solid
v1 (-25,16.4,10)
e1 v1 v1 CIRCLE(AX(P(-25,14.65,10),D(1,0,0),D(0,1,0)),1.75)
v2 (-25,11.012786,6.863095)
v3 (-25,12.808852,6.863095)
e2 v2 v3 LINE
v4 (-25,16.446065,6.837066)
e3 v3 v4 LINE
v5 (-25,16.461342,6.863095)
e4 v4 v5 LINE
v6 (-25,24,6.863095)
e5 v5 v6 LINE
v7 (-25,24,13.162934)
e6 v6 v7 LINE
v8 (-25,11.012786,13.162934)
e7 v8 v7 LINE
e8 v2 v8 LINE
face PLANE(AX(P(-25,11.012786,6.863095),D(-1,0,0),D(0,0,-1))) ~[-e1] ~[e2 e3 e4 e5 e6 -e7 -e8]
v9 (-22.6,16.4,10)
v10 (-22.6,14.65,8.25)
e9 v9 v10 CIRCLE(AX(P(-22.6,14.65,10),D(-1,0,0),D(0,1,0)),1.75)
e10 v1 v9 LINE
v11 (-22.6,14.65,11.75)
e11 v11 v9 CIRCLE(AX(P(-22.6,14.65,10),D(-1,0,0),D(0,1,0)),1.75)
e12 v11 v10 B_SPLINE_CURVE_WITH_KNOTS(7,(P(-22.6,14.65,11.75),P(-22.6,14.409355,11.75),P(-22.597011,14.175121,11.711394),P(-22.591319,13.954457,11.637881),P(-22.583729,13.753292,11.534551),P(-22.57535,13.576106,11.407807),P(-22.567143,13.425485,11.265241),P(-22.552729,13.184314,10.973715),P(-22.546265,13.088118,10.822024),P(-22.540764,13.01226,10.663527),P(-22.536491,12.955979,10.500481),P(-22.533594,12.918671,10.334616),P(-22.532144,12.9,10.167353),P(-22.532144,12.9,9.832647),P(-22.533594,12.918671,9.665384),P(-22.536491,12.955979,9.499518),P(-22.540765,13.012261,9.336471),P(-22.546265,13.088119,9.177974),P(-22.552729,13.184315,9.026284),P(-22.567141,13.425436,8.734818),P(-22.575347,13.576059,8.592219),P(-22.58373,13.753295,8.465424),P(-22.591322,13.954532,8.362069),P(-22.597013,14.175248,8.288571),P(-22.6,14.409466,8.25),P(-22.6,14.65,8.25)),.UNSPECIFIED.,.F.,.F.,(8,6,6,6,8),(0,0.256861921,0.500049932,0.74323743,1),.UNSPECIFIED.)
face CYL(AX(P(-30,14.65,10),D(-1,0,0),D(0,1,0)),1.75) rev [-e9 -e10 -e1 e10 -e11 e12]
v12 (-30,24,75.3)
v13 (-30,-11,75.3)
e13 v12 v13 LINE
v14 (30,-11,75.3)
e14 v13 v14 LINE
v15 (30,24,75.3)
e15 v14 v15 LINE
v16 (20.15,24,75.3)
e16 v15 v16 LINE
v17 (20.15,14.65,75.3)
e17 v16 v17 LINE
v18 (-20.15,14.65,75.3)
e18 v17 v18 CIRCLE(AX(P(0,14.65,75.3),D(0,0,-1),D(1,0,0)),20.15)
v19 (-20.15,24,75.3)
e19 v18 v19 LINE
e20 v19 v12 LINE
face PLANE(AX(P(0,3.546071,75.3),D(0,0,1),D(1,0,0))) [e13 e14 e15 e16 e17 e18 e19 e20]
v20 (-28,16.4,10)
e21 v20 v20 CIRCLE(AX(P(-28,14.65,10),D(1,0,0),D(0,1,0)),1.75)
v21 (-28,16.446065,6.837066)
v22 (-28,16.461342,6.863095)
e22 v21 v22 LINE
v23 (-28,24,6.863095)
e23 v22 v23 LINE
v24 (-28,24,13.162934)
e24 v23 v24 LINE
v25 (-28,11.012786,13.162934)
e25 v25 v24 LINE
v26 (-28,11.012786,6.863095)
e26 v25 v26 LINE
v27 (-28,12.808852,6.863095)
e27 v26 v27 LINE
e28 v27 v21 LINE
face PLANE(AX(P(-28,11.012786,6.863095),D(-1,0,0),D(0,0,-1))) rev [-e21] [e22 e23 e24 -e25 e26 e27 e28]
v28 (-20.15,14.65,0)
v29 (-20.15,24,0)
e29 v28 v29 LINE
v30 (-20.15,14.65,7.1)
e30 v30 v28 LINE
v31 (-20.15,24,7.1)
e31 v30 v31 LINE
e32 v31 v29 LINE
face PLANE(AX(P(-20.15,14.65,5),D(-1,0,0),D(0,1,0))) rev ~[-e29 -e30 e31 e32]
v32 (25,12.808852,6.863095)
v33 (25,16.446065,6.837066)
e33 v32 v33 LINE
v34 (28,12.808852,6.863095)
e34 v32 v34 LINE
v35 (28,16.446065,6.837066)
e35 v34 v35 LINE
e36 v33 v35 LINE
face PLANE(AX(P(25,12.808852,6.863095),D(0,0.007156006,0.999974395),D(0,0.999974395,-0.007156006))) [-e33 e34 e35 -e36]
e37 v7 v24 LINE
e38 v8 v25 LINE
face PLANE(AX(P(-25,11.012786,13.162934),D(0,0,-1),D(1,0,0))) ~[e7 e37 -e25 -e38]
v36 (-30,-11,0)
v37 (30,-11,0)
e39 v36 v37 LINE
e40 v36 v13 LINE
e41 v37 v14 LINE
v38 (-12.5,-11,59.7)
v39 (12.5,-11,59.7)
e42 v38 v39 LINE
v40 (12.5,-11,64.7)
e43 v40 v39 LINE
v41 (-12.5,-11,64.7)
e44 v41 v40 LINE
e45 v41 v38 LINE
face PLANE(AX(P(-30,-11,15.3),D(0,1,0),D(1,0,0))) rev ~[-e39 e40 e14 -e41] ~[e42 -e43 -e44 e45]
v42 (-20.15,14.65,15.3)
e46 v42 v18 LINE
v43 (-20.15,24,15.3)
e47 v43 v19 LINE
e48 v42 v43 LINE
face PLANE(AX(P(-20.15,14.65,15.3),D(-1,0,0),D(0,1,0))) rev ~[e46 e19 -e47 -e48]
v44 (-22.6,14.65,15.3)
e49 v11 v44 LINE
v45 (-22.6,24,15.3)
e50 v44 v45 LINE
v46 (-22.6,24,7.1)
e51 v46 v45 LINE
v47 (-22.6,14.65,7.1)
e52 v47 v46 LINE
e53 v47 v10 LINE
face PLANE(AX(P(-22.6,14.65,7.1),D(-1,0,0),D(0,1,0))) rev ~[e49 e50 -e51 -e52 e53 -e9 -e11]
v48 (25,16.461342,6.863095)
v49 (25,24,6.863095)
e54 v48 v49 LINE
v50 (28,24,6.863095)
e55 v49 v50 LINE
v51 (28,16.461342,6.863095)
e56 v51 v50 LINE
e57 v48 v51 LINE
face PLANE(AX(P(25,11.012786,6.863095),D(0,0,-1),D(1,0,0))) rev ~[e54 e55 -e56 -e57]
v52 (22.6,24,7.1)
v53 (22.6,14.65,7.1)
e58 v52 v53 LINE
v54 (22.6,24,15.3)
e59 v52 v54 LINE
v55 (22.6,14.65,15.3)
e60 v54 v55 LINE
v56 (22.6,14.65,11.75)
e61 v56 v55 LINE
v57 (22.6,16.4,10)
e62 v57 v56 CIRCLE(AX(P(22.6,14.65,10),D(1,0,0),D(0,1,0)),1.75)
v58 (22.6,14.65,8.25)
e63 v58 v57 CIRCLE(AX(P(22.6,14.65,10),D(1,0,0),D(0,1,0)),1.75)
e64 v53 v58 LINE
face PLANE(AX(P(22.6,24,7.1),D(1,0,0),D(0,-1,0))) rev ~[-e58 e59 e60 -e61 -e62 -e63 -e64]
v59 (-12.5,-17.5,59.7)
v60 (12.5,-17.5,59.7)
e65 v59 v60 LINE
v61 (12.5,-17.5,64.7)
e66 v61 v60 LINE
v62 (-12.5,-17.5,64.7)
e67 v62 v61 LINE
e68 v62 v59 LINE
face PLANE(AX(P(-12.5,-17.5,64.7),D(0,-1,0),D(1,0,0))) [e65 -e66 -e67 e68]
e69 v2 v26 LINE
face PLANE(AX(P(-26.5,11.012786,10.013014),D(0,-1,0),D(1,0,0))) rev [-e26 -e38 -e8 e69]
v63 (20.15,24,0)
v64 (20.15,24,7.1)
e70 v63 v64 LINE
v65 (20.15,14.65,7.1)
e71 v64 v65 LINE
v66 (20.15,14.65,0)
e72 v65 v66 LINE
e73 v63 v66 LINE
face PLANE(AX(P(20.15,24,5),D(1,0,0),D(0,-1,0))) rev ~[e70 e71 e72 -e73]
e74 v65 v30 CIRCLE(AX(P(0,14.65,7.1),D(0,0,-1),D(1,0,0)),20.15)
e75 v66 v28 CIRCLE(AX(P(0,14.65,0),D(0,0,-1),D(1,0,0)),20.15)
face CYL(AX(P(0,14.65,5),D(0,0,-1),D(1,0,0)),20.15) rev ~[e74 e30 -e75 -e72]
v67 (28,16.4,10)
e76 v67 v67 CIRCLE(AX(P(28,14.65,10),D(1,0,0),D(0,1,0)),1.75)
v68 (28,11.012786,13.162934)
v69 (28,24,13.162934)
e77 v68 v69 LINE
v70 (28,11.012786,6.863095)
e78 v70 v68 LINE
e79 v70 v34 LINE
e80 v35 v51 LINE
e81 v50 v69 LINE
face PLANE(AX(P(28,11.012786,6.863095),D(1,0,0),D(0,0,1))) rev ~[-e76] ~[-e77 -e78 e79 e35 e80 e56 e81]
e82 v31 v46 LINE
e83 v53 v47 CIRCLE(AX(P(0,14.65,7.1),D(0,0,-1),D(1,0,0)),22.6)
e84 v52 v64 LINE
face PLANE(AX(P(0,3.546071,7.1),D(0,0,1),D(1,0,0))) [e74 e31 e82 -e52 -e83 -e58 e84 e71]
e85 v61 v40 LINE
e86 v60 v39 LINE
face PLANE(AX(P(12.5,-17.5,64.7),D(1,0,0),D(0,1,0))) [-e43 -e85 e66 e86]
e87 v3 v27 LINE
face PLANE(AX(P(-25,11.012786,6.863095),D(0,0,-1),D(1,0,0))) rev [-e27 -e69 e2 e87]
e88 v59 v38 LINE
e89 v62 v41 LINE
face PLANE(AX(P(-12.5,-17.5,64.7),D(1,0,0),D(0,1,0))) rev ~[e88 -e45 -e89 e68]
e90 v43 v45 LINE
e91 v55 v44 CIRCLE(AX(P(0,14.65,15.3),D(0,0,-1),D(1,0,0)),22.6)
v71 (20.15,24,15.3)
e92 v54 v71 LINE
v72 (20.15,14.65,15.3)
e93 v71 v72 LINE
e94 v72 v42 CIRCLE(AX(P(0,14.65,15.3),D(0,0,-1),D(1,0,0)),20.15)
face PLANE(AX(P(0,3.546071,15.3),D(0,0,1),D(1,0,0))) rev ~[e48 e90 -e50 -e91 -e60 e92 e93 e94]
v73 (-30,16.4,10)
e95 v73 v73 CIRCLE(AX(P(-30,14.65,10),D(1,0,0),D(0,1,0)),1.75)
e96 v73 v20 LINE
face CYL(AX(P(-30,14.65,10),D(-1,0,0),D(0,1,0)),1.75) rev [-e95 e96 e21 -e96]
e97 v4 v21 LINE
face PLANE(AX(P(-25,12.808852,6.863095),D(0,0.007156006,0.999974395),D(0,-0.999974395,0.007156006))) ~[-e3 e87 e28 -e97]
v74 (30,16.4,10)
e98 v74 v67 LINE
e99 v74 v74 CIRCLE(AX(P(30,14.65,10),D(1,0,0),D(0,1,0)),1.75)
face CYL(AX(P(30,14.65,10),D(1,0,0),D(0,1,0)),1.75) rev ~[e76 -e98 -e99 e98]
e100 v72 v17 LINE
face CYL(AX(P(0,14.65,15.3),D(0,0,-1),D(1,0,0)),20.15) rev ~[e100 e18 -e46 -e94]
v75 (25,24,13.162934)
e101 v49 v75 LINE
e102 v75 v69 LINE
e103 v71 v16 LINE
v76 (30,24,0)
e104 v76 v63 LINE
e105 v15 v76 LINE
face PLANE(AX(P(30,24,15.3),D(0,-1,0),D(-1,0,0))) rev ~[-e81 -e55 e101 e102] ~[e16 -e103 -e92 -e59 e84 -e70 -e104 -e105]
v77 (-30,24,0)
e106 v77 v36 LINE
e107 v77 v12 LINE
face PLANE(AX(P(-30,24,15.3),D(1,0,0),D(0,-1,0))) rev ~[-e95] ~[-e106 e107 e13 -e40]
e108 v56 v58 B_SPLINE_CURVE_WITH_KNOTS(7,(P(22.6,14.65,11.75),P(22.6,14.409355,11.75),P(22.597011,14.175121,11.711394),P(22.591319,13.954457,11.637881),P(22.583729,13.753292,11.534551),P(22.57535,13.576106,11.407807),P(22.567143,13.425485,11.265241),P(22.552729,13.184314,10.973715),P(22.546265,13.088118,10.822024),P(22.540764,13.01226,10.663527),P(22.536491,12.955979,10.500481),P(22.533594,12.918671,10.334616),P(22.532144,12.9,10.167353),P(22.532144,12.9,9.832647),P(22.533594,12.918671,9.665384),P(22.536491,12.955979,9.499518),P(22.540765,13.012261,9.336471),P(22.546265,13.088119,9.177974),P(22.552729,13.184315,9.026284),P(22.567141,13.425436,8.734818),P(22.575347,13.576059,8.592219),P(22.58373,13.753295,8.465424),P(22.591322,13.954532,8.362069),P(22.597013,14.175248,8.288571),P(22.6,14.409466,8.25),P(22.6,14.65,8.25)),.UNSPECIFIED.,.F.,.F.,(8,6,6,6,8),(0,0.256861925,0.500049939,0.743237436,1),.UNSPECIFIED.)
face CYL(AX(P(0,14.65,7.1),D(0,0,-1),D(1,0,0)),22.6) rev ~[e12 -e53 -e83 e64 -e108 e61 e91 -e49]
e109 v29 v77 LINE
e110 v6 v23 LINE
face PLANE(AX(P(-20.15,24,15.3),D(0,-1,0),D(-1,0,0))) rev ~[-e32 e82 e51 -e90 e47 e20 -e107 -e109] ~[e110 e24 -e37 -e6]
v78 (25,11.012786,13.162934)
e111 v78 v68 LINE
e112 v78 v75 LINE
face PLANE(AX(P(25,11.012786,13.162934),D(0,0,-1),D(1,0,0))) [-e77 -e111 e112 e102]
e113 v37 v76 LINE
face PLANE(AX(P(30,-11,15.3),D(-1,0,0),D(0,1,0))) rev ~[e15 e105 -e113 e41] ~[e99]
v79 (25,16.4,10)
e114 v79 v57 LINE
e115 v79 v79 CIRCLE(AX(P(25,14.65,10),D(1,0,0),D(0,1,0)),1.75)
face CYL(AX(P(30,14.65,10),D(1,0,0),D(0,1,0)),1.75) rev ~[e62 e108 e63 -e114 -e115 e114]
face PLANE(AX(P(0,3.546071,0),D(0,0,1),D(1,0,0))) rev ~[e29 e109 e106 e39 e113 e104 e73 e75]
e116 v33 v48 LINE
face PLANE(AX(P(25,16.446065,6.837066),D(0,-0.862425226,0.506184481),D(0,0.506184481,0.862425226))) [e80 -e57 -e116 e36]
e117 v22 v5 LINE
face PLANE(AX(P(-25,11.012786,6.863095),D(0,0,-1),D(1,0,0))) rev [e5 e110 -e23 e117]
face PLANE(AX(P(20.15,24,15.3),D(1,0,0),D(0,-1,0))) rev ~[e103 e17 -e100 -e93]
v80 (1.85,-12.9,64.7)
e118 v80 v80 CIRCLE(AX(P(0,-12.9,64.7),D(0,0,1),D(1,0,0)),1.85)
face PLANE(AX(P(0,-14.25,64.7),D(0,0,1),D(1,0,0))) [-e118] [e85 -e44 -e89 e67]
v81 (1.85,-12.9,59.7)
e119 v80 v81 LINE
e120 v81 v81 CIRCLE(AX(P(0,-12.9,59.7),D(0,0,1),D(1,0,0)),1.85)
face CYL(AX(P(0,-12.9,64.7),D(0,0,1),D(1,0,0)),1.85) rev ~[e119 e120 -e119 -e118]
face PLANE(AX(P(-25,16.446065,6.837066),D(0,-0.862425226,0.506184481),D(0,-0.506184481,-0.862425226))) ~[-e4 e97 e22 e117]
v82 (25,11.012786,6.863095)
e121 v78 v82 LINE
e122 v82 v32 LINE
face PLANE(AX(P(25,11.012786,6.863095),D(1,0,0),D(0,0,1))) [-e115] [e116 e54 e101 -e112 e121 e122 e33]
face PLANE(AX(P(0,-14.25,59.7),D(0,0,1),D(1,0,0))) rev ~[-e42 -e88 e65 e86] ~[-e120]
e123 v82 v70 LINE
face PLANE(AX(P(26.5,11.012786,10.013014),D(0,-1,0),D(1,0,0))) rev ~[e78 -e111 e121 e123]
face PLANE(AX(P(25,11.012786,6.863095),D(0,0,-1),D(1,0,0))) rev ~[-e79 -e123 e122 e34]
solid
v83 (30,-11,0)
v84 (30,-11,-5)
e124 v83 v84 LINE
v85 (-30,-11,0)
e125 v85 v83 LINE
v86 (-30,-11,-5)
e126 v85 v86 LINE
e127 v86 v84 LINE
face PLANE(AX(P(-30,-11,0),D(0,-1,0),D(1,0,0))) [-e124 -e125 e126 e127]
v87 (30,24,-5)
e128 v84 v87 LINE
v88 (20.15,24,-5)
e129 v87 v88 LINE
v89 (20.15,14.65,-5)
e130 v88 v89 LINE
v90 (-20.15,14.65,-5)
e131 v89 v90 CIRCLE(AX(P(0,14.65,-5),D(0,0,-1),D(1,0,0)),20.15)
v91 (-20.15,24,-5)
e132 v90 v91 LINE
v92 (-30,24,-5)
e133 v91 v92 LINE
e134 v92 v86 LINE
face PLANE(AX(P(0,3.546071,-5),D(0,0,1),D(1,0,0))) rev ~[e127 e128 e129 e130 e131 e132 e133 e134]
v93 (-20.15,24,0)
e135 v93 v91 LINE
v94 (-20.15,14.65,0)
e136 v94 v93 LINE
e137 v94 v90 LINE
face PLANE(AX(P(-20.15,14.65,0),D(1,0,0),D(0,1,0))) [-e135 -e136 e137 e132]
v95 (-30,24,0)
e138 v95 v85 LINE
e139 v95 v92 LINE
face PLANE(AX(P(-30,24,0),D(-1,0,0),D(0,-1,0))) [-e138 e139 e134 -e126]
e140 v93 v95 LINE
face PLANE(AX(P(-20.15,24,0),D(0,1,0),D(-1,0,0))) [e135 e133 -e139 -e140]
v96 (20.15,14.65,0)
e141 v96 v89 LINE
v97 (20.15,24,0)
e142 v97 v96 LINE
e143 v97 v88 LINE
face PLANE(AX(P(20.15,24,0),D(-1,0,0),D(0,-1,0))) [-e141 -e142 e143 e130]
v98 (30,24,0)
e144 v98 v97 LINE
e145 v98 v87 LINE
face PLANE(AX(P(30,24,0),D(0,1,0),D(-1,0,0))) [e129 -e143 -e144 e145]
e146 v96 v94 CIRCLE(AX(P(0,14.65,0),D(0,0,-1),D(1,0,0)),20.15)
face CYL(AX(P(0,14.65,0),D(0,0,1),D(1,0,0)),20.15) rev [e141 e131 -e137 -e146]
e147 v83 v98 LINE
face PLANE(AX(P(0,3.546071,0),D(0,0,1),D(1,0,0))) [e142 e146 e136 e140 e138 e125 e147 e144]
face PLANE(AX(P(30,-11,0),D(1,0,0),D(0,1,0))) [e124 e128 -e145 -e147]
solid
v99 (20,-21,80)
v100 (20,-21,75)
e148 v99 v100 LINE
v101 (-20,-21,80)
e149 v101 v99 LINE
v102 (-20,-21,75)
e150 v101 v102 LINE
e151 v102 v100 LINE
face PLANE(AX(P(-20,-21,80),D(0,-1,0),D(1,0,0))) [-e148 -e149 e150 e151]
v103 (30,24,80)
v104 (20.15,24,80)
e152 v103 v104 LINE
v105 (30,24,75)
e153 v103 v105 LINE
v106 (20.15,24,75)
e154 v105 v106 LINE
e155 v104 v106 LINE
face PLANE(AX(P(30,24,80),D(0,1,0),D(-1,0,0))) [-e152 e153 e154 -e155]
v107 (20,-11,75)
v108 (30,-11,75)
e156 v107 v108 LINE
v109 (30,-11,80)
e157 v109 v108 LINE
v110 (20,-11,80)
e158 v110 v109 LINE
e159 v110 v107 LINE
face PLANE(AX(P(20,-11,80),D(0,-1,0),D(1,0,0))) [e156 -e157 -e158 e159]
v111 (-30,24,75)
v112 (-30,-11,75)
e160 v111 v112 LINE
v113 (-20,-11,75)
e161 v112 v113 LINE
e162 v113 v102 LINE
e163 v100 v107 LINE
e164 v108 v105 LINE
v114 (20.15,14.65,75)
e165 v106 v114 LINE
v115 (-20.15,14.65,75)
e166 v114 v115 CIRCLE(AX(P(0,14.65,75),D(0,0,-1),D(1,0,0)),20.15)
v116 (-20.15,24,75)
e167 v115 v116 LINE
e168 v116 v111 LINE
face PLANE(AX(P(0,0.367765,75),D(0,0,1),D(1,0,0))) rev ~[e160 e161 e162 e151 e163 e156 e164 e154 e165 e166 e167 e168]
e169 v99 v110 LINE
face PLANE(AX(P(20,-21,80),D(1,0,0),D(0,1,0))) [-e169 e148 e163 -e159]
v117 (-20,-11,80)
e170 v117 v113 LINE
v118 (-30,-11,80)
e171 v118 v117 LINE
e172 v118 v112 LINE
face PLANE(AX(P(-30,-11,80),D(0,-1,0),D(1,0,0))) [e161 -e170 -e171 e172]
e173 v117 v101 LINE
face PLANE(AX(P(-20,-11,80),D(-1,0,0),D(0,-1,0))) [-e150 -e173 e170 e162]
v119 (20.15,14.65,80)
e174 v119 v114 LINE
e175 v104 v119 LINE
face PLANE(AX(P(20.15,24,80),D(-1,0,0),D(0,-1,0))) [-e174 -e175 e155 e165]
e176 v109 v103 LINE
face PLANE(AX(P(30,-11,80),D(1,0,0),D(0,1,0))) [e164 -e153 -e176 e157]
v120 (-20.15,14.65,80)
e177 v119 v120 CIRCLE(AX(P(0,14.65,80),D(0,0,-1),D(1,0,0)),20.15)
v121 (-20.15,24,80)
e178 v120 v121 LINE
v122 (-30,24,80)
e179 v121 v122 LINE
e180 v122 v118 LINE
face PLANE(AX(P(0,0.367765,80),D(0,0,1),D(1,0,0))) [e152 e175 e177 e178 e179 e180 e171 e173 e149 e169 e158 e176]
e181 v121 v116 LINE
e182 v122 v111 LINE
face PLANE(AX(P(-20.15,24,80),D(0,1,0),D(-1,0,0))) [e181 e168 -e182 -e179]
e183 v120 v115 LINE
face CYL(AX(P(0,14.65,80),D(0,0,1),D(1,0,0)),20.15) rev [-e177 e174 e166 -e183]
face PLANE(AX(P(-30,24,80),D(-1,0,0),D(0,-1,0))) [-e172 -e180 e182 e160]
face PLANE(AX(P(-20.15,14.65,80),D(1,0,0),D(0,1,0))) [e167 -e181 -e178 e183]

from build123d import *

# Parameters (mm, degrees)
F1_DEPTH  = 5
F3_DEPTH  = 2.1
F5_DEPTH  = 8.2
F7_DEPTH  = 60
F10_DEPTH = 5
F12_W     = 25
F12_H     = 6.5
F12_R     = 1.85
F13_DEPTH = 5
F15_R     = 1.75
F16_DEPTH = 3
F17_R     = 1.75
F18_DEPTH = 10
F20_W     = 3
F20_H     = 6.2998386914
F21_DEPTH = 25


# Not quite as in the source:
# - a pattern or mirror of a feature is missing from the dataset's text; its kind, count and spacing are read off the source's solid
# - a feature names something its author has since deleted; it is built from what else it names


with BuildPart() as f1:
    # F0 (on Top) → F1 (new body)
    with BuildSketch(Plane.XY):
        with BuildLine():
            Line((-20.15, 24), (-30, 24))
            Line((-30, 24), (-30, -11))
            Line((-30, -11), (-12.5, -11))
            Line((-12.5, -11), (30, -11))
            Line((30, -11), (30, 24))
            Line((30, 24), (20.15, 24))
            Line((20.15, 24), (20.15, 14.65))
            ThreePointArc((20.15, 14.65), (0, -5.5), (-20.15, 14.65))
            Line((-20.15, 14.65), (-20.15, 24))
        make_face()
    extrude(amount=F1_DEPTH)

    # F2 (on face) → F3 (join)
    with BuildSketch(Plane.XY.offset(5)):
        with BuildLine():
            Line((-20.15, 24), (-30, 24))
            Line((-30, 24), (-30, -11))
            Line((-30, -11), (30, -11))
            Line((30, -11), (30, 24))
            Line((30, 24), (20.15, 24))
            Line((20.15, 24), (20.15, 14.65))
            ThreePointArc((20.15, 14.65), (0, -5.5), (-20.15, 14.65))
            Line((-20.15, 14.65), (-20.15, 24))
        make_face()
    extrude(amount=F3_DEPTH)

    # F4 (on face) → F5 (join)
    with BuildSketch(Plane.XY.offset(7.1)):
        with BuildLine():
            Line((-22.6, 24), (-30, 24))
            Line((-30, 24), (-30, -11))
            Line((-30, -11), (30, -11))
            Line((30, -11), (30, 24))
            Line((30, 24), (22.6, 24))
            Line((22.6, 24), (22.6, 14.65))
            ThreePointArc((22.6, 14.65), (0, -7.95), (-22.6, 14.65))
            Line((-22.6, 14.65), (-22.6, 24))
        make_face()
    extrude(amount=F5_DEPTH)

    # F6 (on face) → F7 (join)
    with BuildSketch(Plane.XY.offset(15.3)):
        with BuildLine():
            Line((-20.15, 24), (-30, 24))
            Line((-30, 24), (-30, -11))
            Line((-30, -11), (30, -11))
            Line((30, -11), (30, 24))
            Line((30, 24), (20.15, 24))
            Line((20.15, 24), (20.15, 14.65))
            ThreePointArc((20.15, 14.65), (0, -5.5), (-20.15, 14.65))
            Line((-20.15, 14.65), (-20.15, 24))
        make_face()
    extrude(amount=F7_DEPTH)

    # F12 (on offset) → F13 (join)
    with BuildSketch(Plane.XY.offset(64.7)):
        with Locations((0, -14.25)):
            Rectangle(F12_W, F12_H)
        with Locations((0, -12.9)):
            Circle(F12_R, mode=Mode.SUBTRACT)
    extrude(amount=-F13_DEPTH)

    # F15 (on offset) → F16 (cut)
    with BuildSketch(Plane.YZ.offset(25)):
        Polygon((11.0127864357, 10.0260285901), (12.8088517975, 6.8630949494), (16.4460653619, 6.8370663592), (18.2872135643, 9.9739714099), (16.4911482025, 13.1369050506), (12.8539346381, 13.1629336408), align=None)
        with Locations((14.65, 10)):
            Circle(F15_R, mode=Mode.SUBTRACT)
    f16 = extrude(amount=F16_DEPTH, mode=Mode.SUBTRACT)

    # F16_copies: F16 across plane
    add(f16.mirror(Plane(origin=(0, 0, 0), x_dir=(0, 0, -1), z_dir=(-1, 0, 0))), mode=Mode.SUBTRACT)

    # F17 (on face) → F18 (cut)
    with BuildSketch(Plane.YZ.offset(30)):
        with Locations((14.65, 10)):
            Circle(F17_R)
    f18 = extrude(amount=-F18_DEPTH, mode=Mode.SUBTRACT)

    # F18_copies: F18 across plane
    add(f18.mirror(Plane(origin=(0, 0, 0), x_dir=(0, 0, -1), z_dir=(-1, 0, 0))), mode=Mode.SUBTRACT)

    # F20 (on plane+point) → F21 (cut)
    with BuildSketch(Plane.XZ.offset(-11.0127864357)):
        with Locations((26.5, 10.0130142951)):
            Rectangle(F20_W, F20_H)
    f21 = extrude(amount=-F21_DEPTH, mode=Mode.SUBTRACT)

    # F21_copies: F21 across plane
    add(f21.mirror(Plane(origin=(0, 0, 0), x_dir=(0, 0, -1), z_dir=(-1, 0, 0))), mode=Mode.SUBTRACT)


with BuildPart() as f10:
    # F9 (on offset) → F10 (new body)
    with BuildSketch(Plane.XY.offset(80)):
        with BuildLine():
            Line((-20.15, 24), (-30, 24))
            Line((-30, 24), (-30, -11))
            Line((-30, -11), (-20, -11))
            Line((-20, -11), (-20, -21))
            Line((-20, -21), (20, -21))
            Line((20, -21), (20, -11))
            Line((20, -11), (30, -11))
            Line((30, -11), (30, 24))
            Line((30, 24), (20.15, 24))
            Line((20.15, 24), (20.15, 14.65))
            ThreePointArc((20.15, 14.65), (0, -5.5), (-20.15, 14.65))
            Line((-20.15, 14.65), (-20.15, 24))
        make_face()
    extrude(amount=-F10_DEPTH)


with BuildPart() as f10b:
    # F0 (on Top) → F10, piece 2 (new body)
    with BuildSketch(Plane.XY):
        with BuildLine():
            Line((-20.15, 24), (-30, 24))
            Line((-30, 24), (-30, -11))
            Line((-30, -11), (-12.5, -11))
            Line((-12.5, -11), (30, -11))
            Line((30, -11), (30, 24))
            Line((30, 24), (20.15, 24))
            Line((20.15, 24), (20.15, 14.65))
            ThreePointArc((20.15, 14.65), (0, -5.5), (-20.15, 14.65))
            Line((-20.15, 14.65), (-20.15, 24))
        make_face()
    extrude(amount=-F10_DEPTH)


solid = Compound([f1.part, f10.part, f10b.part])
